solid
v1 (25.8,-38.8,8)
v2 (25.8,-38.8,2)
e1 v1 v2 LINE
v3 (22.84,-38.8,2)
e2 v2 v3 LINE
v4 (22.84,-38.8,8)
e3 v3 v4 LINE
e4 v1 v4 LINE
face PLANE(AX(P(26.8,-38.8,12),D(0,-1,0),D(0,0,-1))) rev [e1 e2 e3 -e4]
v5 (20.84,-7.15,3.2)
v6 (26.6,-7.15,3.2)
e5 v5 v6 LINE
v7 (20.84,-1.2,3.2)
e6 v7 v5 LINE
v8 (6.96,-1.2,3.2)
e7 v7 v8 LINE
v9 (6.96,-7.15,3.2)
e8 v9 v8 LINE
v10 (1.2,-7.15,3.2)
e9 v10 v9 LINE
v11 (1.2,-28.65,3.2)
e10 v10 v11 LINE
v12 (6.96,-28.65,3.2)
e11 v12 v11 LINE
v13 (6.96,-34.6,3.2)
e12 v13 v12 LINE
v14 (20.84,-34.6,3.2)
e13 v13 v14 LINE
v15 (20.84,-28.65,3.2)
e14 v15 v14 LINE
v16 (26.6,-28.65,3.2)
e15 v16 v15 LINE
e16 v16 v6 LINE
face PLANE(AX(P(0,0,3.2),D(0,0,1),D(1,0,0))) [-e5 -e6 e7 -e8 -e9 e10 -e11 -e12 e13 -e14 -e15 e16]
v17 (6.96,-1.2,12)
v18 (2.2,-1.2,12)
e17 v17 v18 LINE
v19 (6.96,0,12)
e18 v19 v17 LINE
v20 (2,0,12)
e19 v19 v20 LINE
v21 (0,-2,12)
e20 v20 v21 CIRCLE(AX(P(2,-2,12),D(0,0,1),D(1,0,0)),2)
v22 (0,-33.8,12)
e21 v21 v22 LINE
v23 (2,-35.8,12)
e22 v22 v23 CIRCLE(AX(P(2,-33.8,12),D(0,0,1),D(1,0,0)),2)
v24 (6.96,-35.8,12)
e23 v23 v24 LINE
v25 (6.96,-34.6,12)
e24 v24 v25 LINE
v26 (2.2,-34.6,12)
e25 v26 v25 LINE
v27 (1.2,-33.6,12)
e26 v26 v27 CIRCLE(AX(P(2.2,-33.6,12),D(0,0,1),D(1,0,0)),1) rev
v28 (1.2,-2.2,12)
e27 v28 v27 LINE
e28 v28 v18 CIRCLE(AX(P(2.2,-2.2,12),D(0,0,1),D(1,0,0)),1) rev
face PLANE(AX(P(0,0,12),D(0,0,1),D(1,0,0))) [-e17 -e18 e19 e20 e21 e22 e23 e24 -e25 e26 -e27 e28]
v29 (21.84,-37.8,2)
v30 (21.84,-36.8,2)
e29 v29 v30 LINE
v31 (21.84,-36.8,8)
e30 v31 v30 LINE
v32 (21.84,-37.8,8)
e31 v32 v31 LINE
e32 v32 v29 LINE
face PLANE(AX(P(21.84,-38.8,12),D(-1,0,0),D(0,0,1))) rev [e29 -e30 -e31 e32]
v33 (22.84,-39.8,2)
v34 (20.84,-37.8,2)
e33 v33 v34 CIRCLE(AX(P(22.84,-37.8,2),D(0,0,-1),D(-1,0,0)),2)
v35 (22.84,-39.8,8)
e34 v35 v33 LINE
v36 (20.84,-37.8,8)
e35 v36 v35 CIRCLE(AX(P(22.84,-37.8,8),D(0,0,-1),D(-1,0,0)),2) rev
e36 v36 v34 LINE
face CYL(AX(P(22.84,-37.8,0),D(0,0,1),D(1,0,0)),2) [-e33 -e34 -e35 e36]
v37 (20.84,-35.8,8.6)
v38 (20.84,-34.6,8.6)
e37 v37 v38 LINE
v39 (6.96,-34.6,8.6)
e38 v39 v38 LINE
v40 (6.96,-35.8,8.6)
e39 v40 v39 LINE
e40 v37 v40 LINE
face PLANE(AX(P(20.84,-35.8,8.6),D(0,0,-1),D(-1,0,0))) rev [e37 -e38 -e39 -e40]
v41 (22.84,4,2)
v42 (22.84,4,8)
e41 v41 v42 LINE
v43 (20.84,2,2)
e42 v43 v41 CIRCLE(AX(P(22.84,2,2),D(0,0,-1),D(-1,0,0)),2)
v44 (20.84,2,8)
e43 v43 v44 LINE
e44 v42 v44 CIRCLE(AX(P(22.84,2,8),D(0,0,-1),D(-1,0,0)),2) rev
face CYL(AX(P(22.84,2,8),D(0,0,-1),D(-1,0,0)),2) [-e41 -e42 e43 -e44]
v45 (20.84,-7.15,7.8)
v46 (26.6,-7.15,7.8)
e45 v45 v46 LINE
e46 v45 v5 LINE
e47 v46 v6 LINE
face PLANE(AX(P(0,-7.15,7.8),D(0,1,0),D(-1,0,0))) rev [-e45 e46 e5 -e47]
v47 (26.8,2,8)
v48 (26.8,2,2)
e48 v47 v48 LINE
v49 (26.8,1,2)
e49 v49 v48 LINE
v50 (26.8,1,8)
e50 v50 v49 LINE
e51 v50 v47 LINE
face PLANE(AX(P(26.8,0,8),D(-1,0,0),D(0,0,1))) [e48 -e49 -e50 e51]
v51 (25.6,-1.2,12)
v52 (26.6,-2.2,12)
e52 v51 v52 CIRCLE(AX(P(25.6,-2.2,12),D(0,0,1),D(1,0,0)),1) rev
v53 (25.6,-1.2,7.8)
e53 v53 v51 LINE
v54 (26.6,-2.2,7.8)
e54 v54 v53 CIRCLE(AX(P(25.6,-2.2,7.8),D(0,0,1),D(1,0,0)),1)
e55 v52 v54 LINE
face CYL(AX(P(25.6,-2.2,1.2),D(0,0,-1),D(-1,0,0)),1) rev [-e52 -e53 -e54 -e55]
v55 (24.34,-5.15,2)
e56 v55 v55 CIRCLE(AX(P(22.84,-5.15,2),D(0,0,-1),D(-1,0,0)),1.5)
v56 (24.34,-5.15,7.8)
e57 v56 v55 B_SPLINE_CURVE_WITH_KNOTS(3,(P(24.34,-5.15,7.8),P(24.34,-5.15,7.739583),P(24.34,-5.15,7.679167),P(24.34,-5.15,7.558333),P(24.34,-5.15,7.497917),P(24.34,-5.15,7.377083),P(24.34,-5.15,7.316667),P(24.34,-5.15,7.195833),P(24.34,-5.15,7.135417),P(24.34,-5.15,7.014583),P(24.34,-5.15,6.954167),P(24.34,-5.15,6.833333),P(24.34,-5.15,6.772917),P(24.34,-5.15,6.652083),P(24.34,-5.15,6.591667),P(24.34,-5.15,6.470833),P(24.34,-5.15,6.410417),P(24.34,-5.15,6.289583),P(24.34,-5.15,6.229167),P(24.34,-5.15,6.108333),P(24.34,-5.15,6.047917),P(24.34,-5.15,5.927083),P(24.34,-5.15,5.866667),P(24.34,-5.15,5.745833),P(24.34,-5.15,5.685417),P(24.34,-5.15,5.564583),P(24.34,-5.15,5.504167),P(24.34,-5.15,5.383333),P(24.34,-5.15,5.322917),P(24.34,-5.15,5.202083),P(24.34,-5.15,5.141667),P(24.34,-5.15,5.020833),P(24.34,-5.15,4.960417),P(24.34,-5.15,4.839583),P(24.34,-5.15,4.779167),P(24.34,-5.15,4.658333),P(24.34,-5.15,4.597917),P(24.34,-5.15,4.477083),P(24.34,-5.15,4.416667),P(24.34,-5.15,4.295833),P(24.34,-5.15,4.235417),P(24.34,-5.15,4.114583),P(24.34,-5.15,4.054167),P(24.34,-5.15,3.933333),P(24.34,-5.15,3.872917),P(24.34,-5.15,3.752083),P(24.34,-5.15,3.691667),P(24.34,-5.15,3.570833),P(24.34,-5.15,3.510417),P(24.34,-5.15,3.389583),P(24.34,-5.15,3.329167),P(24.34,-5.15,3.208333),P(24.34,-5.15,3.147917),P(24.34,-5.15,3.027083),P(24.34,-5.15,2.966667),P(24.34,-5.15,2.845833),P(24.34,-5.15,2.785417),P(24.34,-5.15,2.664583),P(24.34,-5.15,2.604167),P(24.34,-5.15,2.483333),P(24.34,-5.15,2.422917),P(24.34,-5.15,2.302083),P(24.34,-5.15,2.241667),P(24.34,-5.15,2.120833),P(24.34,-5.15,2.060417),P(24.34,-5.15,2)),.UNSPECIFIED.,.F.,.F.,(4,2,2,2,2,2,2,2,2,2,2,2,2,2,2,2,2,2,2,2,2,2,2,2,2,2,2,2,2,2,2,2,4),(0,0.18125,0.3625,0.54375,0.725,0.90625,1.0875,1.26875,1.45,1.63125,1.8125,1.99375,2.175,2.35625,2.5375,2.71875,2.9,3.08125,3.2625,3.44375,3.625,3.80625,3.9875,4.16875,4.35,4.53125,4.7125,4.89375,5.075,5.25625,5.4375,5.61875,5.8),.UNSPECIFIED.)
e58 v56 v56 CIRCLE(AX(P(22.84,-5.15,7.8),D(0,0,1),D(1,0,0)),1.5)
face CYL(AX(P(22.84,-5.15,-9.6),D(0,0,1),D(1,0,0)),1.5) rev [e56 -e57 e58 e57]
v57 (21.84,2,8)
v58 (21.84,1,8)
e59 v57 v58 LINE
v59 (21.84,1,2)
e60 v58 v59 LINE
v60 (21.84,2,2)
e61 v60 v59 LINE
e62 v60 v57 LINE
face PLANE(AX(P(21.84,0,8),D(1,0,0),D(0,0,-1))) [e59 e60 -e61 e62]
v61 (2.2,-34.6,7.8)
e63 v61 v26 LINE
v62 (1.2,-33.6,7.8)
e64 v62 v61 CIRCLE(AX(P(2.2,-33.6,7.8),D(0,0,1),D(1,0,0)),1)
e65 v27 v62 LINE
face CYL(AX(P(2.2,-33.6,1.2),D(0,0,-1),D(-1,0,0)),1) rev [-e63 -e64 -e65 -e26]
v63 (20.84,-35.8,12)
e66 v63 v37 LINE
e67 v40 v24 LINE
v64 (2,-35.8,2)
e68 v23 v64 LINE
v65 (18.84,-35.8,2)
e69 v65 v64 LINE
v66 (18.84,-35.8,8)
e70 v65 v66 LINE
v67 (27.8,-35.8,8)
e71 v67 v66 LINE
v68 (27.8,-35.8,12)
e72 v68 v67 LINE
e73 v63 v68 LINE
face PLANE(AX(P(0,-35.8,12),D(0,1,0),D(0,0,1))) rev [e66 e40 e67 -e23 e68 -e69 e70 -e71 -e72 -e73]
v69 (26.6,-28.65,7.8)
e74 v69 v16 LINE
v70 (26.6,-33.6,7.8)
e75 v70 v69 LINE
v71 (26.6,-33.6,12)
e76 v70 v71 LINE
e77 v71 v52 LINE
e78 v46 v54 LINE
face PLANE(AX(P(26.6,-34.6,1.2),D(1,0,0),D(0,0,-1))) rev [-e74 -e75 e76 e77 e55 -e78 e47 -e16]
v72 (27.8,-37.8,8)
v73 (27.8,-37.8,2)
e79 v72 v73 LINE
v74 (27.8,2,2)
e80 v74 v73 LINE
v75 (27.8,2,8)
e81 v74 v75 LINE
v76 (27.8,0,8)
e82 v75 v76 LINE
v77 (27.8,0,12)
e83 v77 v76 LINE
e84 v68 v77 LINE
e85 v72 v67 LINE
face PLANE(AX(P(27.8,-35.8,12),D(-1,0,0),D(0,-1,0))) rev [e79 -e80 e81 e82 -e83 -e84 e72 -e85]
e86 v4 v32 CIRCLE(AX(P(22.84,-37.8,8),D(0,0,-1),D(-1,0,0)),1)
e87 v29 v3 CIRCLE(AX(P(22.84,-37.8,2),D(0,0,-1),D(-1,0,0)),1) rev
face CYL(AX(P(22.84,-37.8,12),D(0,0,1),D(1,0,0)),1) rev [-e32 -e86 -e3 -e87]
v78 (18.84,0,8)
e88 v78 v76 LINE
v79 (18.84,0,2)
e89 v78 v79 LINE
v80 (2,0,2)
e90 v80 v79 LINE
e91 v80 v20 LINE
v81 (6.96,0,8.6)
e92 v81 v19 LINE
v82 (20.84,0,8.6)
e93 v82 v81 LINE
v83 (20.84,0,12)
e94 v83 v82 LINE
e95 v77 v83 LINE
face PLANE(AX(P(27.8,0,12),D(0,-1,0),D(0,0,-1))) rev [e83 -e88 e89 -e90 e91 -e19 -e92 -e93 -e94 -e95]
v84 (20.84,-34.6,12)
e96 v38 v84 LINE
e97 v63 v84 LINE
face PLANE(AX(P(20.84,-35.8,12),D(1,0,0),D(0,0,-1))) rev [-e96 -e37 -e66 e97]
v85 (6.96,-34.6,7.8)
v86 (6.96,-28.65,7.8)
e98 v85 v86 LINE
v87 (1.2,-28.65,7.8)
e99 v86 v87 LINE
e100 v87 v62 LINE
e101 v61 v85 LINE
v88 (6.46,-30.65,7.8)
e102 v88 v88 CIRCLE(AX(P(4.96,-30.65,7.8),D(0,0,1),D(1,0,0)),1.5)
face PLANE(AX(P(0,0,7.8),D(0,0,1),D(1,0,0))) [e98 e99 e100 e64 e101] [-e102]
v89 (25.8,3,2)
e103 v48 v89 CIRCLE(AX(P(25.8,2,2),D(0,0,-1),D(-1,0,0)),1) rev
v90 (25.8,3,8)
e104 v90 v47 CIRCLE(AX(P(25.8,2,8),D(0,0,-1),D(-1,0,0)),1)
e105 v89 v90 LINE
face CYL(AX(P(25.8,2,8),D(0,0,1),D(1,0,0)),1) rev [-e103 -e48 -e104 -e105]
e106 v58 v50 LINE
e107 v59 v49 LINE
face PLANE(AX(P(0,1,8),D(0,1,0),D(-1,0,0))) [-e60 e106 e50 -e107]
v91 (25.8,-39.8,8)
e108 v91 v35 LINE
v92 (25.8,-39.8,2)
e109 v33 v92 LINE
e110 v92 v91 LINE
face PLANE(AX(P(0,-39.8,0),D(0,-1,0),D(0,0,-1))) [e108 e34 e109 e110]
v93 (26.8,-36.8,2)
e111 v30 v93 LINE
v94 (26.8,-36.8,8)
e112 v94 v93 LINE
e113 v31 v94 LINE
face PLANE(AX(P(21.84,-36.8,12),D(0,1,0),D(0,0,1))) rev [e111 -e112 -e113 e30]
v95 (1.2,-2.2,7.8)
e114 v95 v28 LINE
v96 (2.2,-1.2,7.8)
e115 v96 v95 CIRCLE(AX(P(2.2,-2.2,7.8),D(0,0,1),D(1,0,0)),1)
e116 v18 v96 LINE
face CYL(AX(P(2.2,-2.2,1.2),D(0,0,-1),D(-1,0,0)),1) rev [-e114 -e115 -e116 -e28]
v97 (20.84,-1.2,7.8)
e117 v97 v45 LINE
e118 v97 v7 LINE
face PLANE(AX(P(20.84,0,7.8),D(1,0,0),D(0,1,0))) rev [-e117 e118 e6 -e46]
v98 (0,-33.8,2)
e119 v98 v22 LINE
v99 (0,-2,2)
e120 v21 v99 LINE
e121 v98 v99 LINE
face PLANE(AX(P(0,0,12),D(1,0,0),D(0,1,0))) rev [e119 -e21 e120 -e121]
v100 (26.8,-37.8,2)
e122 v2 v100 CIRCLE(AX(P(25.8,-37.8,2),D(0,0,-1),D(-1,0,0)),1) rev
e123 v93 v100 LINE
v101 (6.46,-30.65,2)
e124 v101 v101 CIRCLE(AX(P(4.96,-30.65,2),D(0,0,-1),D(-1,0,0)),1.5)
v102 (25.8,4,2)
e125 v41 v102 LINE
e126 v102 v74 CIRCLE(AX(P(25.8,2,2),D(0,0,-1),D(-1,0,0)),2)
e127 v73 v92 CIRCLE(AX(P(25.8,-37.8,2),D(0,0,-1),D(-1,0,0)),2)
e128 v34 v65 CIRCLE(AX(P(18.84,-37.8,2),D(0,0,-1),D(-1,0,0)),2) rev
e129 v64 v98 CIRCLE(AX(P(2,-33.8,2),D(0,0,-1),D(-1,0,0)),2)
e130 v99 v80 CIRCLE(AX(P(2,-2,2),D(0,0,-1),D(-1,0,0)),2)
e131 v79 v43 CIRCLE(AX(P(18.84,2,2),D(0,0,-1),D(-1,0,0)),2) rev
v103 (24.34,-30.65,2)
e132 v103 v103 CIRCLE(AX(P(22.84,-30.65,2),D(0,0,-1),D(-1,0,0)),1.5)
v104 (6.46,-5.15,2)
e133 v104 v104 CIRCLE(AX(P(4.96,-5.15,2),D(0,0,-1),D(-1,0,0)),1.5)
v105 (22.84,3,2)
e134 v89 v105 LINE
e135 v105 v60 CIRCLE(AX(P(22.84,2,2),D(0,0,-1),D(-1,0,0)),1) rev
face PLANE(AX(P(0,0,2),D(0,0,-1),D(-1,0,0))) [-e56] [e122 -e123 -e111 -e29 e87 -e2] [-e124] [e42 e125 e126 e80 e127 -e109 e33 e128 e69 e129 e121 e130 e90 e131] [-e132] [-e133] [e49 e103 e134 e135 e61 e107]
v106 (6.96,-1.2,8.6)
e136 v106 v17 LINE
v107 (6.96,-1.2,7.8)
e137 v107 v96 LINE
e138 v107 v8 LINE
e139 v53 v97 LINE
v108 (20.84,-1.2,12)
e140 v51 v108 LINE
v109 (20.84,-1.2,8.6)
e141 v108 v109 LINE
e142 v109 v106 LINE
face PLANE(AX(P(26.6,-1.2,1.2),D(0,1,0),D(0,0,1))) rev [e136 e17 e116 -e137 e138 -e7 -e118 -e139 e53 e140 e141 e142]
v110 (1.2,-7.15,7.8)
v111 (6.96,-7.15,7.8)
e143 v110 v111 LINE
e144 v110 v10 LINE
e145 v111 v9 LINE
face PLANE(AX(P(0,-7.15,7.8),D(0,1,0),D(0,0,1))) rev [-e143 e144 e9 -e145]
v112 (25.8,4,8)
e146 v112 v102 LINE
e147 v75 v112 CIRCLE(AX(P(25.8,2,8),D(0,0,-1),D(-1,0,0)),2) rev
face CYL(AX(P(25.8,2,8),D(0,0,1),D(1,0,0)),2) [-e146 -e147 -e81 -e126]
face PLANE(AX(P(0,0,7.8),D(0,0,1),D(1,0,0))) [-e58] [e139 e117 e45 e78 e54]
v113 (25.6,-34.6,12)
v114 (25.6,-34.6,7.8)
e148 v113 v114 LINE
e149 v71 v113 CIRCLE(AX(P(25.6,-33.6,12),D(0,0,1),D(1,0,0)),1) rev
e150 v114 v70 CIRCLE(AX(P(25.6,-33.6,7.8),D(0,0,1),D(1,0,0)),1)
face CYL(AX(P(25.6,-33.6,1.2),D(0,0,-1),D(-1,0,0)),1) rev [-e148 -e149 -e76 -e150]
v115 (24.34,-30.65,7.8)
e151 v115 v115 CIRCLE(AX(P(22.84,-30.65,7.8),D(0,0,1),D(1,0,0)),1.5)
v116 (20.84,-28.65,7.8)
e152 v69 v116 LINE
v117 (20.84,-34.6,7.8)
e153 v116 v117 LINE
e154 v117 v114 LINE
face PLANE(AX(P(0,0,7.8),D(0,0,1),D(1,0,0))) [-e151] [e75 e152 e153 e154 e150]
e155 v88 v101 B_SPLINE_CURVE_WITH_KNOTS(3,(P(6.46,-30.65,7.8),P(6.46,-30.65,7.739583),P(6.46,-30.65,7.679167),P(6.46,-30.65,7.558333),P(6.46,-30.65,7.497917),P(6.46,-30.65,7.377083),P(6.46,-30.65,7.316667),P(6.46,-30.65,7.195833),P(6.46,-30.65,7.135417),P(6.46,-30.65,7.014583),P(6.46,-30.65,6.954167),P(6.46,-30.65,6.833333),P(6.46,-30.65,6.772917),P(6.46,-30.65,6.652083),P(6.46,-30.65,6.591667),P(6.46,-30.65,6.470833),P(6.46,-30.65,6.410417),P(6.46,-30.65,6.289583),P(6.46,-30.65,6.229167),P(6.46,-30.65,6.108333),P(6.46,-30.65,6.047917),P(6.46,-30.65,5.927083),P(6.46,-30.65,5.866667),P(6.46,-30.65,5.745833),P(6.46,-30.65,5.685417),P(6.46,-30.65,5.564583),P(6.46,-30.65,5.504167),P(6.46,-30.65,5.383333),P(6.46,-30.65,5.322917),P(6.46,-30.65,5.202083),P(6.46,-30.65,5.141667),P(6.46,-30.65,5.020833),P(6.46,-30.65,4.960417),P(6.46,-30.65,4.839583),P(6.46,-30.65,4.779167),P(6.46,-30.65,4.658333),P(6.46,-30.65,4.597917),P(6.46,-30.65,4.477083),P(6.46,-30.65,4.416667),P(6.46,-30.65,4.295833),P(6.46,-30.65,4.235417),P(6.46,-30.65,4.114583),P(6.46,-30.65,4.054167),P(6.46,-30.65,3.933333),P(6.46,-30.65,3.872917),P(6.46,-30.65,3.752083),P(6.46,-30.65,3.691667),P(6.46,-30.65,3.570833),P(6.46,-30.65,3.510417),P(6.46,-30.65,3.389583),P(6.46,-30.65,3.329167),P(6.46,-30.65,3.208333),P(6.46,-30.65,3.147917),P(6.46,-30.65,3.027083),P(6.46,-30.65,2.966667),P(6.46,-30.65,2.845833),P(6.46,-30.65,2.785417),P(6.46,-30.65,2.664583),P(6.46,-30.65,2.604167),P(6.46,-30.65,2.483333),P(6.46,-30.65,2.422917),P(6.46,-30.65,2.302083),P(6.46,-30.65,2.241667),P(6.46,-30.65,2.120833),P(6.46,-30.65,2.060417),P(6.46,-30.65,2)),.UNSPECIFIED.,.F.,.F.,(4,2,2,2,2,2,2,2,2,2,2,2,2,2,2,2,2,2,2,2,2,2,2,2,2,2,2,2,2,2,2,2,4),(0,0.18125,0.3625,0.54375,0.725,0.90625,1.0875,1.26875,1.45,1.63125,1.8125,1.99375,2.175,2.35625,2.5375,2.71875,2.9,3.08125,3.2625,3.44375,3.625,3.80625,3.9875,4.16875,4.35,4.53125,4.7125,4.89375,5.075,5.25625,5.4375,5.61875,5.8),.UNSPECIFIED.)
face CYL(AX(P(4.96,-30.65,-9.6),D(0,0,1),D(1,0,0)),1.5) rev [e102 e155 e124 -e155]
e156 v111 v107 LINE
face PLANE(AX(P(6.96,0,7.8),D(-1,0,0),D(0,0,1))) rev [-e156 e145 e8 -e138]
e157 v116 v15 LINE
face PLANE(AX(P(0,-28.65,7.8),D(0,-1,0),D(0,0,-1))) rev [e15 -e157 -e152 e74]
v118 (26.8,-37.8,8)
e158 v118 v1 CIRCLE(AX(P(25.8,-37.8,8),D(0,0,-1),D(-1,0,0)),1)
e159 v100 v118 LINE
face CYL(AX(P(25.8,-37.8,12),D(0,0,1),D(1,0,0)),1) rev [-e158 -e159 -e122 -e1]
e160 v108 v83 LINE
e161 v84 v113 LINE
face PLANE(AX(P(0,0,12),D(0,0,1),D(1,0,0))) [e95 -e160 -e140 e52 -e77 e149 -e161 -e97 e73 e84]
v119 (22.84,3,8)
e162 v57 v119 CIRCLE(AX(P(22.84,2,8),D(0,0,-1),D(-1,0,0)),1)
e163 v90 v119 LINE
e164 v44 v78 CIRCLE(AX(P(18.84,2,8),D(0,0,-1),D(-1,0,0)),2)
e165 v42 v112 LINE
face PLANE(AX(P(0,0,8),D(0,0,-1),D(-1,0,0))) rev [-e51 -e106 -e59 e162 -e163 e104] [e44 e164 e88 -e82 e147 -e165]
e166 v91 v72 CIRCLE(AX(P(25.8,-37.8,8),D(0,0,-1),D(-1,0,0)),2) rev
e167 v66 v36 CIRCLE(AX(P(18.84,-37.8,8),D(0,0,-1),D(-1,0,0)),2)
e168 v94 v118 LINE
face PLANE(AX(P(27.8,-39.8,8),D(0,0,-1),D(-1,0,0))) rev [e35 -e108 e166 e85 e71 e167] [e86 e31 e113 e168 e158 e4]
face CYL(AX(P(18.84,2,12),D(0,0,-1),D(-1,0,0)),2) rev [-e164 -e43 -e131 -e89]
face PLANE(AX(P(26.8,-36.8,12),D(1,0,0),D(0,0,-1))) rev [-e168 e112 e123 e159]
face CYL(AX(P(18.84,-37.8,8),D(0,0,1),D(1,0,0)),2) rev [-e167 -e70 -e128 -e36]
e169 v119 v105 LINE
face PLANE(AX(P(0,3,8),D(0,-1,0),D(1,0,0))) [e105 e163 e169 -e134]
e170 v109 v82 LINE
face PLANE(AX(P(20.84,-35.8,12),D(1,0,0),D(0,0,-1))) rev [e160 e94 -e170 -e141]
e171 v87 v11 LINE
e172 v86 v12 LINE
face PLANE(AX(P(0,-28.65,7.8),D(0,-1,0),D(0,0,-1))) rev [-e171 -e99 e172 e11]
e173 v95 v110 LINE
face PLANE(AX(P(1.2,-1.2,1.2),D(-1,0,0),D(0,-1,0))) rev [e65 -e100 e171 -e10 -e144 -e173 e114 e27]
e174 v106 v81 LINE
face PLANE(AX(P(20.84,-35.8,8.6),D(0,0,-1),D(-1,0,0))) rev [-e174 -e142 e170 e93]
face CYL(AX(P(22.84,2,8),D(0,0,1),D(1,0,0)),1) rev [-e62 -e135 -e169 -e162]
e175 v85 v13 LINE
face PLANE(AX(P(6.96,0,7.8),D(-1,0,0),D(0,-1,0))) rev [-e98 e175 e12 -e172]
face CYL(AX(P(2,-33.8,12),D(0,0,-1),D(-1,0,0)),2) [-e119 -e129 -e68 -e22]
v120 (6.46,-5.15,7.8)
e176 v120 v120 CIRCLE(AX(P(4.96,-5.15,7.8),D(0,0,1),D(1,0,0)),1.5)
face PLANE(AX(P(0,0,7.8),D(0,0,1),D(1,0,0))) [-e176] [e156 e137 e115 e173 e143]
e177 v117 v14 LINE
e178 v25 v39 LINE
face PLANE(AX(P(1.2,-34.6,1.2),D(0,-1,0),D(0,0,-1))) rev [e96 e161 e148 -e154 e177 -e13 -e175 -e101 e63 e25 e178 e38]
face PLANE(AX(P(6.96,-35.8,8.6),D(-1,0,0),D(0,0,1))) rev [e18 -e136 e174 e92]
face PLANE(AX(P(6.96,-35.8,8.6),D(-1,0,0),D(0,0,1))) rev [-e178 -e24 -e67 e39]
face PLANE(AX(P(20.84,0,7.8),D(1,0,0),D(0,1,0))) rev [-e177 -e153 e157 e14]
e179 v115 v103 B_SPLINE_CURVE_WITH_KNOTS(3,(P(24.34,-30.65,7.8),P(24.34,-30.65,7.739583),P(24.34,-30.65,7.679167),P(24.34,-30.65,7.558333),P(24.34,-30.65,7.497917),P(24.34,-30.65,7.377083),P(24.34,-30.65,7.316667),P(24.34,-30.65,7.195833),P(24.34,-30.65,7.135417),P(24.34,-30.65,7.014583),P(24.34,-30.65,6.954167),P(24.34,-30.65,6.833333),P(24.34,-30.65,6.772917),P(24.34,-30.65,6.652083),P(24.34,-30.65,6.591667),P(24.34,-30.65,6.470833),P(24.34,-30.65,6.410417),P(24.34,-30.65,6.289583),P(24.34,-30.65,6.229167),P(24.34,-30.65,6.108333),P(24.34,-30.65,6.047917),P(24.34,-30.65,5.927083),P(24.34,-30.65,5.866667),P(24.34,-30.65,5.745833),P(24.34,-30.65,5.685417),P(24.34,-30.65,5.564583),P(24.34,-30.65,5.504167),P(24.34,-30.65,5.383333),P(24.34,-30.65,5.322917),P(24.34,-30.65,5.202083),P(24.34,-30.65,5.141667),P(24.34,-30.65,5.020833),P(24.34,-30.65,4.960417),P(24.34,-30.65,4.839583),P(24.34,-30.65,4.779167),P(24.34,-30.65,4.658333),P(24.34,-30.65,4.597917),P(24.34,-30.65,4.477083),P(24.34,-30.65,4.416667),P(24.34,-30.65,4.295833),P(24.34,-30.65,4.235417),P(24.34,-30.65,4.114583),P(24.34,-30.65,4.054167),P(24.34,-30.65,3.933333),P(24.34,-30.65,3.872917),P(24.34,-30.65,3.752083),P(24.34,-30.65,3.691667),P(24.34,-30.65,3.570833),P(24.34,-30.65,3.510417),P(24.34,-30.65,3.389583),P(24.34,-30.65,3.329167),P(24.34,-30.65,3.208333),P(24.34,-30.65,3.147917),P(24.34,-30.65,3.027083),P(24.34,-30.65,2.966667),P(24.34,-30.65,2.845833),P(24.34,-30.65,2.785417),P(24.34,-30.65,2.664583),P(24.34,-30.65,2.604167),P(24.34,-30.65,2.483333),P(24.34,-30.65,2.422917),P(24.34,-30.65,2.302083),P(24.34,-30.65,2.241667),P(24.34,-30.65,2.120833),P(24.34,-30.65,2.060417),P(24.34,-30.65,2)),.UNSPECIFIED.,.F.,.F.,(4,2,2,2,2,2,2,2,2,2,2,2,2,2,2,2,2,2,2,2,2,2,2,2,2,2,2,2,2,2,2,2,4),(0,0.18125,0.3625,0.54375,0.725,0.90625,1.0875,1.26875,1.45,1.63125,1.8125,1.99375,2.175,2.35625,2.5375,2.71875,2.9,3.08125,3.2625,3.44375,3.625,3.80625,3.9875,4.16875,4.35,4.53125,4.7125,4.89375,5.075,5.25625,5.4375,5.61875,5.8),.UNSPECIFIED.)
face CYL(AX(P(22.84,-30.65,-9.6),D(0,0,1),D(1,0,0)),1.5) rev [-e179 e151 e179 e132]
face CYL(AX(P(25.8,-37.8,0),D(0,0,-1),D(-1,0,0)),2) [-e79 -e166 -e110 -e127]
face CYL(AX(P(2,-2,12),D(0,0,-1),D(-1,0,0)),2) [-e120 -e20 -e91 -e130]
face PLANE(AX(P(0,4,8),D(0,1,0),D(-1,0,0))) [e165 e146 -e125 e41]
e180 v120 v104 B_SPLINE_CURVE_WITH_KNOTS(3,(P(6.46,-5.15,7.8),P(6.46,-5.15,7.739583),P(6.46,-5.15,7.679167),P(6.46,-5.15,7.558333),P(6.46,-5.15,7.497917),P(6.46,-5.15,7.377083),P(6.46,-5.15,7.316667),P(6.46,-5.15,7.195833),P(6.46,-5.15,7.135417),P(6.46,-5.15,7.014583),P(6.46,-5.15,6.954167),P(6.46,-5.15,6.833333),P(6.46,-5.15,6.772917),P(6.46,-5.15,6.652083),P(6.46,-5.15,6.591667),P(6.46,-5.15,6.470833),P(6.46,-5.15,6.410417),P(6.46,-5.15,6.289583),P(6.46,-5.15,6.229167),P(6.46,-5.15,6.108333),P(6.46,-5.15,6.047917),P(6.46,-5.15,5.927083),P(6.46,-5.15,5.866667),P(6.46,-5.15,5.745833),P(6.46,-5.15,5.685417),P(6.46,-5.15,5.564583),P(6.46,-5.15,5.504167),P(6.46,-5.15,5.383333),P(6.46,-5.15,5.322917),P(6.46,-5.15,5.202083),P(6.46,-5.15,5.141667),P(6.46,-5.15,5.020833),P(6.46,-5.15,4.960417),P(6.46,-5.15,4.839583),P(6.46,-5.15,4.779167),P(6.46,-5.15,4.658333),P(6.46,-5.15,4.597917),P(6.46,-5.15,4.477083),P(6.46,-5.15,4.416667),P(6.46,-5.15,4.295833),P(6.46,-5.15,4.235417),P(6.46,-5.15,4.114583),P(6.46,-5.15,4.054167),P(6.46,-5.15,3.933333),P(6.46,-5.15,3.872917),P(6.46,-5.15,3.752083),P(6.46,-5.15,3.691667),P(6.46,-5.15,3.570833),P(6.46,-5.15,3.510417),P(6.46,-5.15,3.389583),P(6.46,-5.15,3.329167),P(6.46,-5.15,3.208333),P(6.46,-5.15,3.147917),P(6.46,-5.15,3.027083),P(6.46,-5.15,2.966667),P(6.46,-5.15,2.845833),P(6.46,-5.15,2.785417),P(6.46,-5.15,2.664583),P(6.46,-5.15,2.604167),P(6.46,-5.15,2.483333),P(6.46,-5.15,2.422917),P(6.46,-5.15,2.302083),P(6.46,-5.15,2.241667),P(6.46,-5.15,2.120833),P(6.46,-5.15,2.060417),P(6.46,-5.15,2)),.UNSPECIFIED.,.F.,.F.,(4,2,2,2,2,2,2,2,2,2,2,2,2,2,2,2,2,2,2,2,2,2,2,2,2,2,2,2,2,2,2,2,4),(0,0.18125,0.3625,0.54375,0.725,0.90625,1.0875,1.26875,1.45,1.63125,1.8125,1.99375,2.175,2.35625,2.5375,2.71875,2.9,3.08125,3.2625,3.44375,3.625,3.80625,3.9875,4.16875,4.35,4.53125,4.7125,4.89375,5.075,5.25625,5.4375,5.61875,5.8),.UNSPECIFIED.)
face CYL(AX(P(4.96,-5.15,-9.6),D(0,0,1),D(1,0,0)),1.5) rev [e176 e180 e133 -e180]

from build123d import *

# Parameters (mm, degrees)
SKIZZE1_W         = 27.8
SKIZZE1_H         = 35.8
EXTRUSION1_DEPTH  = 12
SKIZZE2_W         = 25.4
SKIZZE2_H         = 33.4
EXTRUSION2_DEPTH  = 10.8
SKIZZE3_R         = 1.5
EXTRUSION3_DEPTH  = 10.8
EXTRUSION4_START  = 6.6
SKIZZE4_W         = 5.76
SKIZZE4_H         = 5.95
SKIZZE4_R         = 1.5
EXTRUSION4_DEPTH  = 6.6
SKIZZE5_W         = 13.88
SKIZZE5_H         = 3.4
EXTRUSION5_DEPTH  = 47.887951544
EXTRUSION6_DEPTH  = 2
SKIZZE7_W         = 27.8
SKIZZE7_H         = 35.8
EXTRUSION7_DEPTH  = 2
SKIZZE8_W         = 6.96
SKIZZE8_H         = 6
EXTRUSION8_DEPTH  = 4
SKIZZE9_W         = 4.96
SKIZZE9_H         = 2
EXTRUSION9_DEPTH  = 50.566924456
SKIZZE10_W        = 6.96
SKIZZE10_H        = 4
SKIZZE10_W_2      = 4.96
SKIZZE10_H_2      = 2
EXTRUSION10_DEPTH = 6
RUNDUNG1_R        = 2
RUNDUNG2_R        = 1
RUNDUNG3_R        = 1
SKIZZE11_R        = 1.5
EXTRUSION11_DEPTH = 10


with BuildPart() as part:
    # Skizze1 → Extrusion1 (new body)
    with BuildSketch(Plane.XY):
        with Locations((13.9, -17.9)):
            Rectangle(SKIZZE1_W, SKIZZE1_H)
    extrude(amount=EXTRUSION1_DEPTH)

    # Skizze2 → Extrusion2 (cut)
    with BuildSketch(Plane.XY.offset(12)):
        with Locations((13.9, -17.9)):
            Rectangle(SKIZZE2_W, SKIZZE2_H)
    extrude(amount=-EXTRUSION2_DEPTH, mode=Mode.SUBTRACT)

    # Skizze3 → Extrusion3 (cut)
    with BuildSketch(Plane.XY.offset(1.2)):
        with Locations((22.84, -30.65)):
            Circle(SKIZZE3_R)
        with Locations((4.96, -30.65)):
            Circle(SKIZZE3_R)
        with Locations((22.84, -5.15)):
            Circle(SKIZZE3_R)
        with Locations((4.96, -5.15)):
            Circle(SKIZZE3_R)
    extrude(amount=-EXTRUSION3_DEPTH, mode=Mode.SUBTRACT)

    # Skizze4 → Extrusion4 (add)
    # profile 1 of 4: a face of its own
    with BuildSketch(Plane.XY.offset(1.2).offset(EXTRUSION4_START)):
        with Locations((4.08, -4.175)):
            Rectangle(SKIZZE4_W, SKIZZE4_H)
        with Locations((4.96, -5.15)):
            Circle(SKIZZE4_R, mode=Mode.SUBTRACT)
    # profile 2 of 4: a face of its own
    with BuildSketch(Plane.XY.offset(1.2).offset(EXTRUSION4_START)):
        with Locations((23.72, -4.175)):
            Rectangle(SKIZZE4_W, SKIZZE4_H)
        with Locations((22.84, -5.15)):
            Circle(SKIZZE4_R, mode=Mode.SUBTRACT)
    # profile 3 of 4: a face of its own
    with BuildSketch(Plane.XY.offset(1.2).offset(EXTRUSION4_START)):
        with Locations((23.72, -31.625)):
            Rectangle(SKIZZE4_W, SKIZZE4_H)
        with Locations((22.84, -30.65)):
            Circle(SKIZZE4_R, mode=Mode.SUBTRACT)
    # profile 4 of 4: a face of its own
    with BuildSketch(Plane.XY.offset(1.2).offset(EXTRUSION4_START)):
        with Locations((4.08, -31.625)):
            Rectangle(SKIZZE4_W, SKIZZE4_H)
        with Locations((4.96, -30.65)):
            Circle(SKIZZE4_R, mode=Mode.SUBTRACT)
    extrude(amount=-EXTRUSION4_DEPTH)

    # Skizze5 → Extrusion5 (cut, through all)
    with BuildSketch(Plane(origin=(0, 0, 0), x_dir=(-1, 0, 0), z_dir=(0, 1, 0))):
        with Locations((-13.9, 10.3)):
            Rectangle(SKIZZE5_W, SKIZZE5_H)
    extrude(amount=-EXTRUSION5_DEPTH, mode=Mode.SUBTRACT)

    # Skizze6 → Extrusion6 (add)
    with BuildSketch(Plane.XY.offset(1.2)):
        Polygon((26.6, -1.2), (1.2, -1.2), (1.2, -34.6), (20.84, -34.6), (26.6, -34.6), align=None)
    extrude(amount=EXTRUSION6_DEPTH)

    # Skizze7 → Extrusion7 (cut)
    with BuildSketch(Plane(origin=(0, 0, 0), x_dir=(-1, 0, 0), z_dir=(0, 0, -1))):
        with Locations((-13.9, -17.9)):
            Rectangle(SKIZZE7_W, SKIZZE7_H)
    extrude(amount=-EXTRUSION7_DEPTH, mode=Mode.SUBTRACT)

    # Skizze8 → Extrusion8 (add)
    with BuildSketch(Plane.XZ.offset(35.8)):
        with Locations((24.32, 5)):
            Rectangle(SKIZZE8_W, SKIZZE8_H)
    extrude(amount=EXTRUSION8_DEPTH)

    # Skizze9 → Extrusion9 (cut, through all)
    with BuildSketch(Plane(origin=(0, 0, 2), x_dir=(-1, 0, 0), z_dir=(0, 0, -1))):
        with Locations((-24.32, -37.8)):
            Rectangle(SKIZZE9_W, SKIZZE9_H)
    extrude(amount=-EXTRUSION9_DEPTH, mode=Mode.SUBTRACT)

    # Skizze10 → Extrusion10 (add)
    with BuildSketch(Plane(origin=(0, 0, 2), x_dir=(-1, 0, 0), z_dir=(0, 0, -1))):
        with Locations((-24.32, 2)):
            Rectangle(SKIZZE10_W, SKIZZE10_H)
        with Locations((-24.32, 2)):
            Rectangle(SKIZZE10_W_2, SKIZZE10_H_2, mode=Mode.SUBTRACT)
    extrude(amount=-EXTRUSION10_DEPTH)

    # Rundung1
    rundung1_edges = [part.edges().sort_by_distance(p)[0] for p in [
        (0, 0, 7),
        (0, -35.8, 7),
        (20.84, -39.8, 5),
        (27.8, -39.8, 5),
        (20.84, 4, 5),
        (27.8, 4, 5),
        (20.84, -35.8, 5),
        (20.84, 0, 5),
    ]]
    fillet(rundung1_edges, radius=RUNDUNG1_R - 0.0001)  # a hair under: the kernel refuses the full size

    # Rundung2
    rundung2_edges = [part.edges().sort_by_distance(p)[0] for p in [
        (1.2, -1.2, 9.9),
        (26.6, -1.2, 9.9),
        (26.6, -34.6, 9.9),
        (1.2, -34.6, 9.9),
    ]]
    fillet(rundung2_edges, radius=RUNDUNG2_R)

    # Rundung3
    rundung3_edges = [part.edges().sort_by_distance(p)[0] for p in [
        (26.8, -38.8, 5),
        (21.84, -38.8, 5),
        (21.84, 3, 5),
        (26.8, 3, 5),
    ]]
    fillet(rundung3_edges, radius=RUNDUNG3_R)

    # Skizze11 → Extrusion11 (cut)
    with BuildSketch(Plane.XY.offset(7.8)):
        with Locations((4.96, -5.15)):
            Circle(SKIZZE11_R)
        with Locations((22.84, -5.15)):
            Circle(SKIZZE11_R)
        with Locations((4.96, -30.65)):
            Circle(SKIZZE11_R)
        with Locations((22.84, -30.65)):
            Circle(SKIZZE11_R)
    extrude(amount=-EXTRUSION11_DEPTH, mode=Mode.SUBTRACT)


solid = part.part
